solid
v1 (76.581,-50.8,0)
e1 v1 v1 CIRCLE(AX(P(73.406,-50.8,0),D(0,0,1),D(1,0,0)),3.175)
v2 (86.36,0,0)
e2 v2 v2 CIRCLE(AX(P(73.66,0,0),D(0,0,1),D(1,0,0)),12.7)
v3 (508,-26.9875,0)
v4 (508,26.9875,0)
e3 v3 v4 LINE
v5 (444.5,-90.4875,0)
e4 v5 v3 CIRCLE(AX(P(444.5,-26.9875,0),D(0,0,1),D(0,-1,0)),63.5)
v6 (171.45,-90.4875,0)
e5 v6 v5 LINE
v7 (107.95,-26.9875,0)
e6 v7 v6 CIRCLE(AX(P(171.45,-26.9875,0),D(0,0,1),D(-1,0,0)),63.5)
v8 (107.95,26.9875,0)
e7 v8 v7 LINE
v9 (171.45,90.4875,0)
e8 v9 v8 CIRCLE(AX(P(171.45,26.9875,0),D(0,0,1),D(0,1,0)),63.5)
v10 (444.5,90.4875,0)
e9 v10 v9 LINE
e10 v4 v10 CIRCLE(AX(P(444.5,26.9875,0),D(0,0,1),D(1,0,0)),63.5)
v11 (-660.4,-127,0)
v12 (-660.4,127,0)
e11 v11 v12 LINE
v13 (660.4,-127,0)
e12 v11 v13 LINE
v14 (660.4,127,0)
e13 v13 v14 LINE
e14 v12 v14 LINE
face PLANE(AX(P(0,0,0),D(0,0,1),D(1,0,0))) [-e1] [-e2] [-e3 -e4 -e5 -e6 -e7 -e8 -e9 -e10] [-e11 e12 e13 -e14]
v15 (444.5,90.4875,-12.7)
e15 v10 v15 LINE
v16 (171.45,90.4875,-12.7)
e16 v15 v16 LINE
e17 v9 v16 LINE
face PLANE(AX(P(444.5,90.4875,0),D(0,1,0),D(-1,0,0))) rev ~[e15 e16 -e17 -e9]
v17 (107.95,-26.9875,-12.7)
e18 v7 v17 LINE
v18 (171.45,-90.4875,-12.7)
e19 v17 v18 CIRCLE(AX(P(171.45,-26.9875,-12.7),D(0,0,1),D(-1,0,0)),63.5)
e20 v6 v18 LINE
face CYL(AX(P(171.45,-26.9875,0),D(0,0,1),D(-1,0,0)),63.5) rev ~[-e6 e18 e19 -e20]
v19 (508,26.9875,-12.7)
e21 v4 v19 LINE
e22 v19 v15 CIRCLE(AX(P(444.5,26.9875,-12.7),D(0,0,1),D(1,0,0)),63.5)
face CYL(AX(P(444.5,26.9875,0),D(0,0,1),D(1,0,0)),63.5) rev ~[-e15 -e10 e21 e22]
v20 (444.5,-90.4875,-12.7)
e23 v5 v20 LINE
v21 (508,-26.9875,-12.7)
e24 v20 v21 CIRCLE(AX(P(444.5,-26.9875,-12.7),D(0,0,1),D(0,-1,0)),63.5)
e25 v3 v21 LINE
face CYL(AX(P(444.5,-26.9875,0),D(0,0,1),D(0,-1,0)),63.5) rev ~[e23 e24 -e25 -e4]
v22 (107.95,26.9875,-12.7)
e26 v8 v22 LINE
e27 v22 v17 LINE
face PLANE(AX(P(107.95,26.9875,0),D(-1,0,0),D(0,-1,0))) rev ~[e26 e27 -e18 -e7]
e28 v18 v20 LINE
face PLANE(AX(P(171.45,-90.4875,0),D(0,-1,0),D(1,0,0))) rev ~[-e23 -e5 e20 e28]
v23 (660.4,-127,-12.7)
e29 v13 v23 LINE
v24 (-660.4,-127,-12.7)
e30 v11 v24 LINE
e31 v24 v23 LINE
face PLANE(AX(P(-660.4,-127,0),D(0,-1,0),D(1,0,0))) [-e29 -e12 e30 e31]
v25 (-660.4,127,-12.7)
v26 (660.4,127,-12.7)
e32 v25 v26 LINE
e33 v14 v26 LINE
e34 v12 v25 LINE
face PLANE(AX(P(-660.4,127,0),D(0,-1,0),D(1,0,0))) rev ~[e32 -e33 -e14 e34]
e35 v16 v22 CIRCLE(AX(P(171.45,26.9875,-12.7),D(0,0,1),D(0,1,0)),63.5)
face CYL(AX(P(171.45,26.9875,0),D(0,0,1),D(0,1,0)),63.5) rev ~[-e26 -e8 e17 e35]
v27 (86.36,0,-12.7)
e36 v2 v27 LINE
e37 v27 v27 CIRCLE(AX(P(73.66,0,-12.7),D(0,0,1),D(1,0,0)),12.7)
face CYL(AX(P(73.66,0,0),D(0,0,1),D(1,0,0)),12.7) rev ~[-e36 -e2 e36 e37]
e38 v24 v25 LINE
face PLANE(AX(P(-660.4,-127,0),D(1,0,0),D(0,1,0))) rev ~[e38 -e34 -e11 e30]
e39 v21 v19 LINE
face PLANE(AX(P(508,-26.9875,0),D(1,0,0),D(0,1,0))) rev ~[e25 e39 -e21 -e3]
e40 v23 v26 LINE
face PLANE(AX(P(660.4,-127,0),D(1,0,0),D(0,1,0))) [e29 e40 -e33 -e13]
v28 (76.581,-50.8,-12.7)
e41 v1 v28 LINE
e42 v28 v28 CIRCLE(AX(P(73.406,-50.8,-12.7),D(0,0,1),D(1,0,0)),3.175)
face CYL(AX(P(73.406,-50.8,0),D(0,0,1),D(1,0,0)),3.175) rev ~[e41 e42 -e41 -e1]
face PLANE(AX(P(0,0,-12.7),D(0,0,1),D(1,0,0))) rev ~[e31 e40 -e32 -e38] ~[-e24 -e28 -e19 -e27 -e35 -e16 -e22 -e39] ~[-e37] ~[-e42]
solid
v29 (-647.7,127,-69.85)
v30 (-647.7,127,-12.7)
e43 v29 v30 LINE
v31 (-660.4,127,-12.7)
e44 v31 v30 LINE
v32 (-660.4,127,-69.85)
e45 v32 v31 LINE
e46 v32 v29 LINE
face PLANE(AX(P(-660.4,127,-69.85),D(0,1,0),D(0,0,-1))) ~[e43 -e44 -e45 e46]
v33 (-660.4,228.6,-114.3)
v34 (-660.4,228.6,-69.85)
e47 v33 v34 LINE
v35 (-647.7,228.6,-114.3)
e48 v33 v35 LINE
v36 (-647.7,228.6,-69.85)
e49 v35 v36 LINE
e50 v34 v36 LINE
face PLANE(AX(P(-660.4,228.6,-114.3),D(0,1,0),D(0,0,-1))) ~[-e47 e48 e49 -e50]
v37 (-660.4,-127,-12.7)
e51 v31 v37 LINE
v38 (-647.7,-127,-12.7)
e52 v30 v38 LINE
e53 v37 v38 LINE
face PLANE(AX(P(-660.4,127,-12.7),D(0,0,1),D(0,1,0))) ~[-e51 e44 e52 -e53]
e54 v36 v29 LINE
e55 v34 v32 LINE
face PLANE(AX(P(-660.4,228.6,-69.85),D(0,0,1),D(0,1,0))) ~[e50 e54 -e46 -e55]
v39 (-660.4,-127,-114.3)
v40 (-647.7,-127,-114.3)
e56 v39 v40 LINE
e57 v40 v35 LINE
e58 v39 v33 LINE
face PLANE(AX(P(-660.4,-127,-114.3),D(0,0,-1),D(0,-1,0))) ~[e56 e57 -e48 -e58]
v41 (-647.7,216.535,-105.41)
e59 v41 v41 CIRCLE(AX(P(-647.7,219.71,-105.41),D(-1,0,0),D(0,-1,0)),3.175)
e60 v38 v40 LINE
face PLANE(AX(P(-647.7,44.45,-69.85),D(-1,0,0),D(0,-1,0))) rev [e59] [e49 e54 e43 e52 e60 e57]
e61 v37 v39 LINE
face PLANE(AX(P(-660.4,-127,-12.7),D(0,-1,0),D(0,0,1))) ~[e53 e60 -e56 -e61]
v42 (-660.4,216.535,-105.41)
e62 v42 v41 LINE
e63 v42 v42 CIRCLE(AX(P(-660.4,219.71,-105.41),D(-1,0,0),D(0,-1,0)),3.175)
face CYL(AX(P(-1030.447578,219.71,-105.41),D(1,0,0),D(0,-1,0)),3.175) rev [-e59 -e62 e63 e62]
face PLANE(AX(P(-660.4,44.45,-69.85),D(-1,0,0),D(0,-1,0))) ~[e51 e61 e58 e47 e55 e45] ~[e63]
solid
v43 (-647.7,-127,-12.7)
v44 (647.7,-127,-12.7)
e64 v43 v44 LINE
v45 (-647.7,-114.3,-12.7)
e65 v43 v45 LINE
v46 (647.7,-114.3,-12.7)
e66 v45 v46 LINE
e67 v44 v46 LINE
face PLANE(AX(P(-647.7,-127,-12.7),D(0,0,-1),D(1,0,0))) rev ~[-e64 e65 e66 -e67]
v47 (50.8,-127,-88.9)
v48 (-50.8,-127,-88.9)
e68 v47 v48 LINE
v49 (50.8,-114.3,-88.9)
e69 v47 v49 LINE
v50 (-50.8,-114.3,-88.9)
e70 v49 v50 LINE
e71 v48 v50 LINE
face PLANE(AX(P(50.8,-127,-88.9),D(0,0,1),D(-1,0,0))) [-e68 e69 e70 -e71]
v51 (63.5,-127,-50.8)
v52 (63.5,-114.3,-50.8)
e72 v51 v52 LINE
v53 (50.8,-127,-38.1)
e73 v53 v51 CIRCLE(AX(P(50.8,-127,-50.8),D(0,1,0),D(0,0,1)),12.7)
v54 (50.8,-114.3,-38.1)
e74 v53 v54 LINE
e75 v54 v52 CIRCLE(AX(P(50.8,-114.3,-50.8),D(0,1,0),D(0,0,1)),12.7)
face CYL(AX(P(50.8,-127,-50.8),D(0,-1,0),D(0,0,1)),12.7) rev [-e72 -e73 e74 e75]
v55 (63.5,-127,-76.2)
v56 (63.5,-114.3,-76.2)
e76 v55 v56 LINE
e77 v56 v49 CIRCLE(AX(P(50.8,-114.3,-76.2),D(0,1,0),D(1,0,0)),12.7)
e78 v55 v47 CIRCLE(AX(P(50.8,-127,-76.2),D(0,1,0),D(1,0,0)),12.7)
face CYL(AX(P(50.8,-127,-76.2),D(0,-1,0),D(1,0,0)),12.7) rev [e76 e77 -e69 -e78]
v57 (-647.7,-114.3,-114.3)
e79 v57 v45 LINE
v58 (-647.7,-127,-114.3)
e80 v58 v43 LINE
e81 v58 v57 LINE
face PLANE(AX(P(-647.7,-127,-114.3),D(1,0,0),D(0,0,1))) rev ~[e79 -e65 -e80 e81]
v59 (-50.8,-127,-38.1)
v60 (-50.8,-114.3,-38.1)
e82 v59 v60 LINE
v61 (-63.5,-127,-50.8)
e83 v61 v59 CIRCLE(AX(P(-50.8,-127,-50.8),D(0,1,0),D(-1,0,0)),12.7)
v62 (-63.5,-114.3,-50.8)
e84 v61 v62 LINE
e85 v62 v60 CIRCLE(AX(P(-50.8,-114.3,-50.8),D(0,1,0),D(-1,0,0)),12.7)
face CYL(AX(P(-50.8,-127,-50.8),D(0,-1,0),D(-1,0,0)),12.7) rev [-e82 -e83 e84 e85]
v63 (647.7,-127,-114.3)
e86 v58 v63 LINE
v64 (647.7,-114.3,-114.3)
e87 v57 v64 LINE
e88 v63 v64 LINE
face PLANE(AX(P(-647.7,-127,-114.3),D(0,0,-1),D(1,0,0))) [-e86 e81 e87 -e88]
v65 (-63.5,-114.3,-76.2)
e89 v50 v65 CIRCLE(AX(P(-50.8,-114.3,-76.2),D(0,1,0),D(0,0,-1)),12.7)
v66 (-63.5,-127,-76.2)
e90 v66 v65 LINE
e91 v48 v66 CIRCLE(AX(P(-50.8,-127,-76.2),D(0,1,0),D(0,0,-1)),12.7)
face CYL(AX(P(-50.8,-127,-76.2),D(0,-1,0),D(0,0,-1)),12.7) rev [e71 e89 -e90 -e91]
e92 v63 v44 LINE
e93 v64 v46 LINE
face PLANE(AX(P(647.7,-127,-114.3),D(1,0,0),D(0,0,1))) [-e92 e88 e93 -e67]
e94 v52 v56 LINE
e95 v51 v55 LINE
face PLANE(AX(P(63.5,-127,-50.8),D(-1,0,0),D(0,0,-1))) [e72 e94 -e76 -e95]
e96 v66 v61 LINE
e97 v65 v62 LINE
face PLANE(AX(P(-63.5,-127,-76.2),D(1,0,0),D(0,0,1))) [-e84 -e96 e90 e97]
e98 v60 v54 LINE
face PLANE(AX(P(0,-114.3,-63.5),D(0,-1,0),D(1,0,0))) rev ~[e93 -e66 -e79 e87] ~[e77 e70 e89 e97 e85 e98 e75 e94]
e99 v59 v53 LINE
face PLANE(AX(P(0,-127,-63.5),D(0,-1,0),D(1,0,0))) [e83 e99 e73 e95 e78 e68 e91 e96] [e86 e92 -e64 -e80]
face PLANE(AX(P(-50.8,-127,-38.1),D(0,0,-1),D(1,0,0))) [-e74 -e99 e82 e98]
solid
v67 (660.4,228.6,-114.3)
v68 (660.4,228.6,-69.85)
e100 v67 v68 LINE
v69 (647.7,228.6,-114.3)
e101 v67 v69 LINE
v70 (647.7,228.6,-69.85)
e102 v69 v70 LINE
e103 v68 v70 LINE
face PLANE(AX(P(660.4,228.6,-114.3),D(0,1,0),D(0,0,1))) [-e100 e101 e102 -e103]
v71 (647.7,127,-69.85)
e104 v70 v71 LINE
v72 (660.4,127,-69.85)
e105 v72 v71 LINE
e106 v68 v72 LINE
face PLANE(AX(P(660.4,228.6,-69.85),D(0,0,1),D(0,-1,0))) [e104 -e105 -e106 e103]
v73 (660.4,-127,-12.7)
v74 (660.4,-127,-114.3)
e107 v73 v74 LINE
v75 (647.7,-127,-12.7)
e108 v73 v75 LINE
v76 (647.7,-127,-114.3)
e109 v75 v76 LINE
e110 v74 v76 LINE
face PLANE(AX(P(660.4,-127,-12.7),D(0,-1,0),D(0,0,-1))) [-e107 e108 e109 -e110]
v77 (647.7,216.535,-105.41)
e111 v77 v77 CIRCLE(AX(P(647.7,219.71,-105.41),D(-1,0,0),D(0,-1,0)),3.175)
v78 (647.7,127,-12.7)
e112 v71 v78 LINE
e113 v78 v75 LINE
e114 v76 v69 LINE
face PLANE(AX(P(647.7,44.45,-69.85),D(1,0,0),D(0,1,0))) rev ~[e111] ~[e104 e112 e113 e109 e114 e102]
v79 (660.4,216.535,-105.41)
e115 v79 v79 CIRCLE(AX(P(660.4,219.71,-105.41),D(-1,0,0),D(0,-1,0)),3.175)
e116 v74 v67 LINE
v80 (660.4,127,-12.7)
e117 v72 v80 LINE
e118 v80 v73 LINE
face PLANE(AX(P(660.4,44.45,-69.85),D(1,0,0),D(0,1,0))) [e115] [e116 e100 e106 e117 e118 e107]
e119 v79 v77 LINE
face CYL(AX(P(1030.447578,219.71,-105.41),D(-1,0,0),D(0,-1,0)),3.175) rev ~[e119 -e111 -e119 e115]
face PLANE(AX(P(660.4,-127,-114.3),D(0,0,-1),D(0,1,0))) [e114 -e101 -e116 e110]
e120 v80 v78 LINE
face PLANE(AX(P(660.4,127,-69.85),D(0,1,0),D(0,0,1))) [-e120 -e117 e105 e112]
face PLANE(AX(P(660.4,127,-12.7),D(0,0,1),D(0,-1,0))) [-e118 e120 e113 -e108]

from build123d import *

# Parameters (mm, degrees)
F0_W      = 1320.8
F0_H      = 254
F1_DEPTH  = 12.7
F4_DEPTH  = 12.7
F5_D      = 6.35
F8_DEPTH  = 114.301
F9_R      = 12.7
F9_R_2    = 3.175
F10_DEPTH = 114.301
F12_W     = 1295.4
F12_H     = 101.6
F13_DEPTH = 12.7


with BuildPart() as f1:
    # F0 (on Top) → F1 (new body)
    with BuildSketch(Plane.XY):
        Rectangle(F0_W, F0_H)
    extrude(amount=-F1_DEPTH)

    # F7 (on Top) → F8 (cut, through all)
    with BuildSketch(Plane.XY):
        with BuildLine():
            ThreePointArc((508, 26.9875), (489.4012806053, 71.8887806053), (444.5, 90.4875))
            Line((444.5, 90.4875), (171.45, 90.4875))
            ThreePointArc((171.45, 90.4875), (126.5487193947, 71.8887806053), (107.95, 26.9875))
            Line((107.95, 26.9875), (107.95, -26.9875))
            ThreePointArc((107.95, -26.9875), (126.5487193947, -71.8887806053), (171.45, -90.4875))
            Line((171.45, -90.4875), (444.5, -90.4875))
            ThreePointArc((444.5, -90.4875), (489.4012806053, -71.8887806053), (508, -26.9875))
            Line((508, -26.9875), (508, 26.9875))
        make_face()
    extrude(amount=-F8_DEPTH, mode=Mode.SUBTRACT)

    # F9 (on Top) → F10 (cut, through all)
    with BuildSketch(Plane.XY):
        with Locations((73.66, 0)):
            Circle(F9_R)
        with Locations((73.406, -50.8)):
            Circle(F9_R_2)
    extrude(amount=-F10_DEPTH, mode=Mode.SUBTRACT)


with BuildPart() as f4:
    # F3 (on offset) → F4 (new body)
    with BuildSketch(Plane.YZ.offset(660.4)):
        Polygon((-127, -12.7), (-127, -114.3), (228.6, -114.3), (228.6, -69.85), (127, -69.85), (127, -12.7), (0, -12.7), align=None)
    extrude(amount=-F4_DEPTH)

    # F5 (through all)
    with Locations(Plane.YZ.offset(660.4)):
        with Locations((219.71, -105.41)):
            Hole(F5_D / 2)


with BuildPart() as f6_1:
    # F6: instance of F4
    add(f4.part.mirror(Plane.YZ))


with BuildPart() as f13:
    # F12 (on offset) → F13 (new body)
    with BuildSketch(Plane.XZ.offset(127)):
        with Locations((0, -63.5)):
            Rectangle(F12_W, F12_H)
        with BuildLine():
            ThreePointArc((63.5, -76.2), (59.7802561211, -85.1802561211), (50.8, -88.9))
            Line((50.8, -88.9), (-50.8, -88.9))
            ThreePointArc((-50.8, -88.9), (-59.7802561211, -85.1802561211), (-63.5, -76.2))
            Line((-63.5, -76.2), (-63.5, -50.8))
            ThreePointArc((-63.5, -50.8), (-59.7802561211, -41.8197438789), (-50.8, -38.1))
            Line((-50.8, -38.1), (50.8, -38.1))
            ThreePointArc((50.8, -38.1), (59.7802561211, -41.8197438789), (63.5, -50.8))
            Line((63.5, -50.8), (63.5, -76.2))
        make_face(mode=Mode.SUBTRACT)
    extrude(amount=-F13_DEPTH)


solid = Compound([f1.part, f4.part, f6_1.part, f13.part])
